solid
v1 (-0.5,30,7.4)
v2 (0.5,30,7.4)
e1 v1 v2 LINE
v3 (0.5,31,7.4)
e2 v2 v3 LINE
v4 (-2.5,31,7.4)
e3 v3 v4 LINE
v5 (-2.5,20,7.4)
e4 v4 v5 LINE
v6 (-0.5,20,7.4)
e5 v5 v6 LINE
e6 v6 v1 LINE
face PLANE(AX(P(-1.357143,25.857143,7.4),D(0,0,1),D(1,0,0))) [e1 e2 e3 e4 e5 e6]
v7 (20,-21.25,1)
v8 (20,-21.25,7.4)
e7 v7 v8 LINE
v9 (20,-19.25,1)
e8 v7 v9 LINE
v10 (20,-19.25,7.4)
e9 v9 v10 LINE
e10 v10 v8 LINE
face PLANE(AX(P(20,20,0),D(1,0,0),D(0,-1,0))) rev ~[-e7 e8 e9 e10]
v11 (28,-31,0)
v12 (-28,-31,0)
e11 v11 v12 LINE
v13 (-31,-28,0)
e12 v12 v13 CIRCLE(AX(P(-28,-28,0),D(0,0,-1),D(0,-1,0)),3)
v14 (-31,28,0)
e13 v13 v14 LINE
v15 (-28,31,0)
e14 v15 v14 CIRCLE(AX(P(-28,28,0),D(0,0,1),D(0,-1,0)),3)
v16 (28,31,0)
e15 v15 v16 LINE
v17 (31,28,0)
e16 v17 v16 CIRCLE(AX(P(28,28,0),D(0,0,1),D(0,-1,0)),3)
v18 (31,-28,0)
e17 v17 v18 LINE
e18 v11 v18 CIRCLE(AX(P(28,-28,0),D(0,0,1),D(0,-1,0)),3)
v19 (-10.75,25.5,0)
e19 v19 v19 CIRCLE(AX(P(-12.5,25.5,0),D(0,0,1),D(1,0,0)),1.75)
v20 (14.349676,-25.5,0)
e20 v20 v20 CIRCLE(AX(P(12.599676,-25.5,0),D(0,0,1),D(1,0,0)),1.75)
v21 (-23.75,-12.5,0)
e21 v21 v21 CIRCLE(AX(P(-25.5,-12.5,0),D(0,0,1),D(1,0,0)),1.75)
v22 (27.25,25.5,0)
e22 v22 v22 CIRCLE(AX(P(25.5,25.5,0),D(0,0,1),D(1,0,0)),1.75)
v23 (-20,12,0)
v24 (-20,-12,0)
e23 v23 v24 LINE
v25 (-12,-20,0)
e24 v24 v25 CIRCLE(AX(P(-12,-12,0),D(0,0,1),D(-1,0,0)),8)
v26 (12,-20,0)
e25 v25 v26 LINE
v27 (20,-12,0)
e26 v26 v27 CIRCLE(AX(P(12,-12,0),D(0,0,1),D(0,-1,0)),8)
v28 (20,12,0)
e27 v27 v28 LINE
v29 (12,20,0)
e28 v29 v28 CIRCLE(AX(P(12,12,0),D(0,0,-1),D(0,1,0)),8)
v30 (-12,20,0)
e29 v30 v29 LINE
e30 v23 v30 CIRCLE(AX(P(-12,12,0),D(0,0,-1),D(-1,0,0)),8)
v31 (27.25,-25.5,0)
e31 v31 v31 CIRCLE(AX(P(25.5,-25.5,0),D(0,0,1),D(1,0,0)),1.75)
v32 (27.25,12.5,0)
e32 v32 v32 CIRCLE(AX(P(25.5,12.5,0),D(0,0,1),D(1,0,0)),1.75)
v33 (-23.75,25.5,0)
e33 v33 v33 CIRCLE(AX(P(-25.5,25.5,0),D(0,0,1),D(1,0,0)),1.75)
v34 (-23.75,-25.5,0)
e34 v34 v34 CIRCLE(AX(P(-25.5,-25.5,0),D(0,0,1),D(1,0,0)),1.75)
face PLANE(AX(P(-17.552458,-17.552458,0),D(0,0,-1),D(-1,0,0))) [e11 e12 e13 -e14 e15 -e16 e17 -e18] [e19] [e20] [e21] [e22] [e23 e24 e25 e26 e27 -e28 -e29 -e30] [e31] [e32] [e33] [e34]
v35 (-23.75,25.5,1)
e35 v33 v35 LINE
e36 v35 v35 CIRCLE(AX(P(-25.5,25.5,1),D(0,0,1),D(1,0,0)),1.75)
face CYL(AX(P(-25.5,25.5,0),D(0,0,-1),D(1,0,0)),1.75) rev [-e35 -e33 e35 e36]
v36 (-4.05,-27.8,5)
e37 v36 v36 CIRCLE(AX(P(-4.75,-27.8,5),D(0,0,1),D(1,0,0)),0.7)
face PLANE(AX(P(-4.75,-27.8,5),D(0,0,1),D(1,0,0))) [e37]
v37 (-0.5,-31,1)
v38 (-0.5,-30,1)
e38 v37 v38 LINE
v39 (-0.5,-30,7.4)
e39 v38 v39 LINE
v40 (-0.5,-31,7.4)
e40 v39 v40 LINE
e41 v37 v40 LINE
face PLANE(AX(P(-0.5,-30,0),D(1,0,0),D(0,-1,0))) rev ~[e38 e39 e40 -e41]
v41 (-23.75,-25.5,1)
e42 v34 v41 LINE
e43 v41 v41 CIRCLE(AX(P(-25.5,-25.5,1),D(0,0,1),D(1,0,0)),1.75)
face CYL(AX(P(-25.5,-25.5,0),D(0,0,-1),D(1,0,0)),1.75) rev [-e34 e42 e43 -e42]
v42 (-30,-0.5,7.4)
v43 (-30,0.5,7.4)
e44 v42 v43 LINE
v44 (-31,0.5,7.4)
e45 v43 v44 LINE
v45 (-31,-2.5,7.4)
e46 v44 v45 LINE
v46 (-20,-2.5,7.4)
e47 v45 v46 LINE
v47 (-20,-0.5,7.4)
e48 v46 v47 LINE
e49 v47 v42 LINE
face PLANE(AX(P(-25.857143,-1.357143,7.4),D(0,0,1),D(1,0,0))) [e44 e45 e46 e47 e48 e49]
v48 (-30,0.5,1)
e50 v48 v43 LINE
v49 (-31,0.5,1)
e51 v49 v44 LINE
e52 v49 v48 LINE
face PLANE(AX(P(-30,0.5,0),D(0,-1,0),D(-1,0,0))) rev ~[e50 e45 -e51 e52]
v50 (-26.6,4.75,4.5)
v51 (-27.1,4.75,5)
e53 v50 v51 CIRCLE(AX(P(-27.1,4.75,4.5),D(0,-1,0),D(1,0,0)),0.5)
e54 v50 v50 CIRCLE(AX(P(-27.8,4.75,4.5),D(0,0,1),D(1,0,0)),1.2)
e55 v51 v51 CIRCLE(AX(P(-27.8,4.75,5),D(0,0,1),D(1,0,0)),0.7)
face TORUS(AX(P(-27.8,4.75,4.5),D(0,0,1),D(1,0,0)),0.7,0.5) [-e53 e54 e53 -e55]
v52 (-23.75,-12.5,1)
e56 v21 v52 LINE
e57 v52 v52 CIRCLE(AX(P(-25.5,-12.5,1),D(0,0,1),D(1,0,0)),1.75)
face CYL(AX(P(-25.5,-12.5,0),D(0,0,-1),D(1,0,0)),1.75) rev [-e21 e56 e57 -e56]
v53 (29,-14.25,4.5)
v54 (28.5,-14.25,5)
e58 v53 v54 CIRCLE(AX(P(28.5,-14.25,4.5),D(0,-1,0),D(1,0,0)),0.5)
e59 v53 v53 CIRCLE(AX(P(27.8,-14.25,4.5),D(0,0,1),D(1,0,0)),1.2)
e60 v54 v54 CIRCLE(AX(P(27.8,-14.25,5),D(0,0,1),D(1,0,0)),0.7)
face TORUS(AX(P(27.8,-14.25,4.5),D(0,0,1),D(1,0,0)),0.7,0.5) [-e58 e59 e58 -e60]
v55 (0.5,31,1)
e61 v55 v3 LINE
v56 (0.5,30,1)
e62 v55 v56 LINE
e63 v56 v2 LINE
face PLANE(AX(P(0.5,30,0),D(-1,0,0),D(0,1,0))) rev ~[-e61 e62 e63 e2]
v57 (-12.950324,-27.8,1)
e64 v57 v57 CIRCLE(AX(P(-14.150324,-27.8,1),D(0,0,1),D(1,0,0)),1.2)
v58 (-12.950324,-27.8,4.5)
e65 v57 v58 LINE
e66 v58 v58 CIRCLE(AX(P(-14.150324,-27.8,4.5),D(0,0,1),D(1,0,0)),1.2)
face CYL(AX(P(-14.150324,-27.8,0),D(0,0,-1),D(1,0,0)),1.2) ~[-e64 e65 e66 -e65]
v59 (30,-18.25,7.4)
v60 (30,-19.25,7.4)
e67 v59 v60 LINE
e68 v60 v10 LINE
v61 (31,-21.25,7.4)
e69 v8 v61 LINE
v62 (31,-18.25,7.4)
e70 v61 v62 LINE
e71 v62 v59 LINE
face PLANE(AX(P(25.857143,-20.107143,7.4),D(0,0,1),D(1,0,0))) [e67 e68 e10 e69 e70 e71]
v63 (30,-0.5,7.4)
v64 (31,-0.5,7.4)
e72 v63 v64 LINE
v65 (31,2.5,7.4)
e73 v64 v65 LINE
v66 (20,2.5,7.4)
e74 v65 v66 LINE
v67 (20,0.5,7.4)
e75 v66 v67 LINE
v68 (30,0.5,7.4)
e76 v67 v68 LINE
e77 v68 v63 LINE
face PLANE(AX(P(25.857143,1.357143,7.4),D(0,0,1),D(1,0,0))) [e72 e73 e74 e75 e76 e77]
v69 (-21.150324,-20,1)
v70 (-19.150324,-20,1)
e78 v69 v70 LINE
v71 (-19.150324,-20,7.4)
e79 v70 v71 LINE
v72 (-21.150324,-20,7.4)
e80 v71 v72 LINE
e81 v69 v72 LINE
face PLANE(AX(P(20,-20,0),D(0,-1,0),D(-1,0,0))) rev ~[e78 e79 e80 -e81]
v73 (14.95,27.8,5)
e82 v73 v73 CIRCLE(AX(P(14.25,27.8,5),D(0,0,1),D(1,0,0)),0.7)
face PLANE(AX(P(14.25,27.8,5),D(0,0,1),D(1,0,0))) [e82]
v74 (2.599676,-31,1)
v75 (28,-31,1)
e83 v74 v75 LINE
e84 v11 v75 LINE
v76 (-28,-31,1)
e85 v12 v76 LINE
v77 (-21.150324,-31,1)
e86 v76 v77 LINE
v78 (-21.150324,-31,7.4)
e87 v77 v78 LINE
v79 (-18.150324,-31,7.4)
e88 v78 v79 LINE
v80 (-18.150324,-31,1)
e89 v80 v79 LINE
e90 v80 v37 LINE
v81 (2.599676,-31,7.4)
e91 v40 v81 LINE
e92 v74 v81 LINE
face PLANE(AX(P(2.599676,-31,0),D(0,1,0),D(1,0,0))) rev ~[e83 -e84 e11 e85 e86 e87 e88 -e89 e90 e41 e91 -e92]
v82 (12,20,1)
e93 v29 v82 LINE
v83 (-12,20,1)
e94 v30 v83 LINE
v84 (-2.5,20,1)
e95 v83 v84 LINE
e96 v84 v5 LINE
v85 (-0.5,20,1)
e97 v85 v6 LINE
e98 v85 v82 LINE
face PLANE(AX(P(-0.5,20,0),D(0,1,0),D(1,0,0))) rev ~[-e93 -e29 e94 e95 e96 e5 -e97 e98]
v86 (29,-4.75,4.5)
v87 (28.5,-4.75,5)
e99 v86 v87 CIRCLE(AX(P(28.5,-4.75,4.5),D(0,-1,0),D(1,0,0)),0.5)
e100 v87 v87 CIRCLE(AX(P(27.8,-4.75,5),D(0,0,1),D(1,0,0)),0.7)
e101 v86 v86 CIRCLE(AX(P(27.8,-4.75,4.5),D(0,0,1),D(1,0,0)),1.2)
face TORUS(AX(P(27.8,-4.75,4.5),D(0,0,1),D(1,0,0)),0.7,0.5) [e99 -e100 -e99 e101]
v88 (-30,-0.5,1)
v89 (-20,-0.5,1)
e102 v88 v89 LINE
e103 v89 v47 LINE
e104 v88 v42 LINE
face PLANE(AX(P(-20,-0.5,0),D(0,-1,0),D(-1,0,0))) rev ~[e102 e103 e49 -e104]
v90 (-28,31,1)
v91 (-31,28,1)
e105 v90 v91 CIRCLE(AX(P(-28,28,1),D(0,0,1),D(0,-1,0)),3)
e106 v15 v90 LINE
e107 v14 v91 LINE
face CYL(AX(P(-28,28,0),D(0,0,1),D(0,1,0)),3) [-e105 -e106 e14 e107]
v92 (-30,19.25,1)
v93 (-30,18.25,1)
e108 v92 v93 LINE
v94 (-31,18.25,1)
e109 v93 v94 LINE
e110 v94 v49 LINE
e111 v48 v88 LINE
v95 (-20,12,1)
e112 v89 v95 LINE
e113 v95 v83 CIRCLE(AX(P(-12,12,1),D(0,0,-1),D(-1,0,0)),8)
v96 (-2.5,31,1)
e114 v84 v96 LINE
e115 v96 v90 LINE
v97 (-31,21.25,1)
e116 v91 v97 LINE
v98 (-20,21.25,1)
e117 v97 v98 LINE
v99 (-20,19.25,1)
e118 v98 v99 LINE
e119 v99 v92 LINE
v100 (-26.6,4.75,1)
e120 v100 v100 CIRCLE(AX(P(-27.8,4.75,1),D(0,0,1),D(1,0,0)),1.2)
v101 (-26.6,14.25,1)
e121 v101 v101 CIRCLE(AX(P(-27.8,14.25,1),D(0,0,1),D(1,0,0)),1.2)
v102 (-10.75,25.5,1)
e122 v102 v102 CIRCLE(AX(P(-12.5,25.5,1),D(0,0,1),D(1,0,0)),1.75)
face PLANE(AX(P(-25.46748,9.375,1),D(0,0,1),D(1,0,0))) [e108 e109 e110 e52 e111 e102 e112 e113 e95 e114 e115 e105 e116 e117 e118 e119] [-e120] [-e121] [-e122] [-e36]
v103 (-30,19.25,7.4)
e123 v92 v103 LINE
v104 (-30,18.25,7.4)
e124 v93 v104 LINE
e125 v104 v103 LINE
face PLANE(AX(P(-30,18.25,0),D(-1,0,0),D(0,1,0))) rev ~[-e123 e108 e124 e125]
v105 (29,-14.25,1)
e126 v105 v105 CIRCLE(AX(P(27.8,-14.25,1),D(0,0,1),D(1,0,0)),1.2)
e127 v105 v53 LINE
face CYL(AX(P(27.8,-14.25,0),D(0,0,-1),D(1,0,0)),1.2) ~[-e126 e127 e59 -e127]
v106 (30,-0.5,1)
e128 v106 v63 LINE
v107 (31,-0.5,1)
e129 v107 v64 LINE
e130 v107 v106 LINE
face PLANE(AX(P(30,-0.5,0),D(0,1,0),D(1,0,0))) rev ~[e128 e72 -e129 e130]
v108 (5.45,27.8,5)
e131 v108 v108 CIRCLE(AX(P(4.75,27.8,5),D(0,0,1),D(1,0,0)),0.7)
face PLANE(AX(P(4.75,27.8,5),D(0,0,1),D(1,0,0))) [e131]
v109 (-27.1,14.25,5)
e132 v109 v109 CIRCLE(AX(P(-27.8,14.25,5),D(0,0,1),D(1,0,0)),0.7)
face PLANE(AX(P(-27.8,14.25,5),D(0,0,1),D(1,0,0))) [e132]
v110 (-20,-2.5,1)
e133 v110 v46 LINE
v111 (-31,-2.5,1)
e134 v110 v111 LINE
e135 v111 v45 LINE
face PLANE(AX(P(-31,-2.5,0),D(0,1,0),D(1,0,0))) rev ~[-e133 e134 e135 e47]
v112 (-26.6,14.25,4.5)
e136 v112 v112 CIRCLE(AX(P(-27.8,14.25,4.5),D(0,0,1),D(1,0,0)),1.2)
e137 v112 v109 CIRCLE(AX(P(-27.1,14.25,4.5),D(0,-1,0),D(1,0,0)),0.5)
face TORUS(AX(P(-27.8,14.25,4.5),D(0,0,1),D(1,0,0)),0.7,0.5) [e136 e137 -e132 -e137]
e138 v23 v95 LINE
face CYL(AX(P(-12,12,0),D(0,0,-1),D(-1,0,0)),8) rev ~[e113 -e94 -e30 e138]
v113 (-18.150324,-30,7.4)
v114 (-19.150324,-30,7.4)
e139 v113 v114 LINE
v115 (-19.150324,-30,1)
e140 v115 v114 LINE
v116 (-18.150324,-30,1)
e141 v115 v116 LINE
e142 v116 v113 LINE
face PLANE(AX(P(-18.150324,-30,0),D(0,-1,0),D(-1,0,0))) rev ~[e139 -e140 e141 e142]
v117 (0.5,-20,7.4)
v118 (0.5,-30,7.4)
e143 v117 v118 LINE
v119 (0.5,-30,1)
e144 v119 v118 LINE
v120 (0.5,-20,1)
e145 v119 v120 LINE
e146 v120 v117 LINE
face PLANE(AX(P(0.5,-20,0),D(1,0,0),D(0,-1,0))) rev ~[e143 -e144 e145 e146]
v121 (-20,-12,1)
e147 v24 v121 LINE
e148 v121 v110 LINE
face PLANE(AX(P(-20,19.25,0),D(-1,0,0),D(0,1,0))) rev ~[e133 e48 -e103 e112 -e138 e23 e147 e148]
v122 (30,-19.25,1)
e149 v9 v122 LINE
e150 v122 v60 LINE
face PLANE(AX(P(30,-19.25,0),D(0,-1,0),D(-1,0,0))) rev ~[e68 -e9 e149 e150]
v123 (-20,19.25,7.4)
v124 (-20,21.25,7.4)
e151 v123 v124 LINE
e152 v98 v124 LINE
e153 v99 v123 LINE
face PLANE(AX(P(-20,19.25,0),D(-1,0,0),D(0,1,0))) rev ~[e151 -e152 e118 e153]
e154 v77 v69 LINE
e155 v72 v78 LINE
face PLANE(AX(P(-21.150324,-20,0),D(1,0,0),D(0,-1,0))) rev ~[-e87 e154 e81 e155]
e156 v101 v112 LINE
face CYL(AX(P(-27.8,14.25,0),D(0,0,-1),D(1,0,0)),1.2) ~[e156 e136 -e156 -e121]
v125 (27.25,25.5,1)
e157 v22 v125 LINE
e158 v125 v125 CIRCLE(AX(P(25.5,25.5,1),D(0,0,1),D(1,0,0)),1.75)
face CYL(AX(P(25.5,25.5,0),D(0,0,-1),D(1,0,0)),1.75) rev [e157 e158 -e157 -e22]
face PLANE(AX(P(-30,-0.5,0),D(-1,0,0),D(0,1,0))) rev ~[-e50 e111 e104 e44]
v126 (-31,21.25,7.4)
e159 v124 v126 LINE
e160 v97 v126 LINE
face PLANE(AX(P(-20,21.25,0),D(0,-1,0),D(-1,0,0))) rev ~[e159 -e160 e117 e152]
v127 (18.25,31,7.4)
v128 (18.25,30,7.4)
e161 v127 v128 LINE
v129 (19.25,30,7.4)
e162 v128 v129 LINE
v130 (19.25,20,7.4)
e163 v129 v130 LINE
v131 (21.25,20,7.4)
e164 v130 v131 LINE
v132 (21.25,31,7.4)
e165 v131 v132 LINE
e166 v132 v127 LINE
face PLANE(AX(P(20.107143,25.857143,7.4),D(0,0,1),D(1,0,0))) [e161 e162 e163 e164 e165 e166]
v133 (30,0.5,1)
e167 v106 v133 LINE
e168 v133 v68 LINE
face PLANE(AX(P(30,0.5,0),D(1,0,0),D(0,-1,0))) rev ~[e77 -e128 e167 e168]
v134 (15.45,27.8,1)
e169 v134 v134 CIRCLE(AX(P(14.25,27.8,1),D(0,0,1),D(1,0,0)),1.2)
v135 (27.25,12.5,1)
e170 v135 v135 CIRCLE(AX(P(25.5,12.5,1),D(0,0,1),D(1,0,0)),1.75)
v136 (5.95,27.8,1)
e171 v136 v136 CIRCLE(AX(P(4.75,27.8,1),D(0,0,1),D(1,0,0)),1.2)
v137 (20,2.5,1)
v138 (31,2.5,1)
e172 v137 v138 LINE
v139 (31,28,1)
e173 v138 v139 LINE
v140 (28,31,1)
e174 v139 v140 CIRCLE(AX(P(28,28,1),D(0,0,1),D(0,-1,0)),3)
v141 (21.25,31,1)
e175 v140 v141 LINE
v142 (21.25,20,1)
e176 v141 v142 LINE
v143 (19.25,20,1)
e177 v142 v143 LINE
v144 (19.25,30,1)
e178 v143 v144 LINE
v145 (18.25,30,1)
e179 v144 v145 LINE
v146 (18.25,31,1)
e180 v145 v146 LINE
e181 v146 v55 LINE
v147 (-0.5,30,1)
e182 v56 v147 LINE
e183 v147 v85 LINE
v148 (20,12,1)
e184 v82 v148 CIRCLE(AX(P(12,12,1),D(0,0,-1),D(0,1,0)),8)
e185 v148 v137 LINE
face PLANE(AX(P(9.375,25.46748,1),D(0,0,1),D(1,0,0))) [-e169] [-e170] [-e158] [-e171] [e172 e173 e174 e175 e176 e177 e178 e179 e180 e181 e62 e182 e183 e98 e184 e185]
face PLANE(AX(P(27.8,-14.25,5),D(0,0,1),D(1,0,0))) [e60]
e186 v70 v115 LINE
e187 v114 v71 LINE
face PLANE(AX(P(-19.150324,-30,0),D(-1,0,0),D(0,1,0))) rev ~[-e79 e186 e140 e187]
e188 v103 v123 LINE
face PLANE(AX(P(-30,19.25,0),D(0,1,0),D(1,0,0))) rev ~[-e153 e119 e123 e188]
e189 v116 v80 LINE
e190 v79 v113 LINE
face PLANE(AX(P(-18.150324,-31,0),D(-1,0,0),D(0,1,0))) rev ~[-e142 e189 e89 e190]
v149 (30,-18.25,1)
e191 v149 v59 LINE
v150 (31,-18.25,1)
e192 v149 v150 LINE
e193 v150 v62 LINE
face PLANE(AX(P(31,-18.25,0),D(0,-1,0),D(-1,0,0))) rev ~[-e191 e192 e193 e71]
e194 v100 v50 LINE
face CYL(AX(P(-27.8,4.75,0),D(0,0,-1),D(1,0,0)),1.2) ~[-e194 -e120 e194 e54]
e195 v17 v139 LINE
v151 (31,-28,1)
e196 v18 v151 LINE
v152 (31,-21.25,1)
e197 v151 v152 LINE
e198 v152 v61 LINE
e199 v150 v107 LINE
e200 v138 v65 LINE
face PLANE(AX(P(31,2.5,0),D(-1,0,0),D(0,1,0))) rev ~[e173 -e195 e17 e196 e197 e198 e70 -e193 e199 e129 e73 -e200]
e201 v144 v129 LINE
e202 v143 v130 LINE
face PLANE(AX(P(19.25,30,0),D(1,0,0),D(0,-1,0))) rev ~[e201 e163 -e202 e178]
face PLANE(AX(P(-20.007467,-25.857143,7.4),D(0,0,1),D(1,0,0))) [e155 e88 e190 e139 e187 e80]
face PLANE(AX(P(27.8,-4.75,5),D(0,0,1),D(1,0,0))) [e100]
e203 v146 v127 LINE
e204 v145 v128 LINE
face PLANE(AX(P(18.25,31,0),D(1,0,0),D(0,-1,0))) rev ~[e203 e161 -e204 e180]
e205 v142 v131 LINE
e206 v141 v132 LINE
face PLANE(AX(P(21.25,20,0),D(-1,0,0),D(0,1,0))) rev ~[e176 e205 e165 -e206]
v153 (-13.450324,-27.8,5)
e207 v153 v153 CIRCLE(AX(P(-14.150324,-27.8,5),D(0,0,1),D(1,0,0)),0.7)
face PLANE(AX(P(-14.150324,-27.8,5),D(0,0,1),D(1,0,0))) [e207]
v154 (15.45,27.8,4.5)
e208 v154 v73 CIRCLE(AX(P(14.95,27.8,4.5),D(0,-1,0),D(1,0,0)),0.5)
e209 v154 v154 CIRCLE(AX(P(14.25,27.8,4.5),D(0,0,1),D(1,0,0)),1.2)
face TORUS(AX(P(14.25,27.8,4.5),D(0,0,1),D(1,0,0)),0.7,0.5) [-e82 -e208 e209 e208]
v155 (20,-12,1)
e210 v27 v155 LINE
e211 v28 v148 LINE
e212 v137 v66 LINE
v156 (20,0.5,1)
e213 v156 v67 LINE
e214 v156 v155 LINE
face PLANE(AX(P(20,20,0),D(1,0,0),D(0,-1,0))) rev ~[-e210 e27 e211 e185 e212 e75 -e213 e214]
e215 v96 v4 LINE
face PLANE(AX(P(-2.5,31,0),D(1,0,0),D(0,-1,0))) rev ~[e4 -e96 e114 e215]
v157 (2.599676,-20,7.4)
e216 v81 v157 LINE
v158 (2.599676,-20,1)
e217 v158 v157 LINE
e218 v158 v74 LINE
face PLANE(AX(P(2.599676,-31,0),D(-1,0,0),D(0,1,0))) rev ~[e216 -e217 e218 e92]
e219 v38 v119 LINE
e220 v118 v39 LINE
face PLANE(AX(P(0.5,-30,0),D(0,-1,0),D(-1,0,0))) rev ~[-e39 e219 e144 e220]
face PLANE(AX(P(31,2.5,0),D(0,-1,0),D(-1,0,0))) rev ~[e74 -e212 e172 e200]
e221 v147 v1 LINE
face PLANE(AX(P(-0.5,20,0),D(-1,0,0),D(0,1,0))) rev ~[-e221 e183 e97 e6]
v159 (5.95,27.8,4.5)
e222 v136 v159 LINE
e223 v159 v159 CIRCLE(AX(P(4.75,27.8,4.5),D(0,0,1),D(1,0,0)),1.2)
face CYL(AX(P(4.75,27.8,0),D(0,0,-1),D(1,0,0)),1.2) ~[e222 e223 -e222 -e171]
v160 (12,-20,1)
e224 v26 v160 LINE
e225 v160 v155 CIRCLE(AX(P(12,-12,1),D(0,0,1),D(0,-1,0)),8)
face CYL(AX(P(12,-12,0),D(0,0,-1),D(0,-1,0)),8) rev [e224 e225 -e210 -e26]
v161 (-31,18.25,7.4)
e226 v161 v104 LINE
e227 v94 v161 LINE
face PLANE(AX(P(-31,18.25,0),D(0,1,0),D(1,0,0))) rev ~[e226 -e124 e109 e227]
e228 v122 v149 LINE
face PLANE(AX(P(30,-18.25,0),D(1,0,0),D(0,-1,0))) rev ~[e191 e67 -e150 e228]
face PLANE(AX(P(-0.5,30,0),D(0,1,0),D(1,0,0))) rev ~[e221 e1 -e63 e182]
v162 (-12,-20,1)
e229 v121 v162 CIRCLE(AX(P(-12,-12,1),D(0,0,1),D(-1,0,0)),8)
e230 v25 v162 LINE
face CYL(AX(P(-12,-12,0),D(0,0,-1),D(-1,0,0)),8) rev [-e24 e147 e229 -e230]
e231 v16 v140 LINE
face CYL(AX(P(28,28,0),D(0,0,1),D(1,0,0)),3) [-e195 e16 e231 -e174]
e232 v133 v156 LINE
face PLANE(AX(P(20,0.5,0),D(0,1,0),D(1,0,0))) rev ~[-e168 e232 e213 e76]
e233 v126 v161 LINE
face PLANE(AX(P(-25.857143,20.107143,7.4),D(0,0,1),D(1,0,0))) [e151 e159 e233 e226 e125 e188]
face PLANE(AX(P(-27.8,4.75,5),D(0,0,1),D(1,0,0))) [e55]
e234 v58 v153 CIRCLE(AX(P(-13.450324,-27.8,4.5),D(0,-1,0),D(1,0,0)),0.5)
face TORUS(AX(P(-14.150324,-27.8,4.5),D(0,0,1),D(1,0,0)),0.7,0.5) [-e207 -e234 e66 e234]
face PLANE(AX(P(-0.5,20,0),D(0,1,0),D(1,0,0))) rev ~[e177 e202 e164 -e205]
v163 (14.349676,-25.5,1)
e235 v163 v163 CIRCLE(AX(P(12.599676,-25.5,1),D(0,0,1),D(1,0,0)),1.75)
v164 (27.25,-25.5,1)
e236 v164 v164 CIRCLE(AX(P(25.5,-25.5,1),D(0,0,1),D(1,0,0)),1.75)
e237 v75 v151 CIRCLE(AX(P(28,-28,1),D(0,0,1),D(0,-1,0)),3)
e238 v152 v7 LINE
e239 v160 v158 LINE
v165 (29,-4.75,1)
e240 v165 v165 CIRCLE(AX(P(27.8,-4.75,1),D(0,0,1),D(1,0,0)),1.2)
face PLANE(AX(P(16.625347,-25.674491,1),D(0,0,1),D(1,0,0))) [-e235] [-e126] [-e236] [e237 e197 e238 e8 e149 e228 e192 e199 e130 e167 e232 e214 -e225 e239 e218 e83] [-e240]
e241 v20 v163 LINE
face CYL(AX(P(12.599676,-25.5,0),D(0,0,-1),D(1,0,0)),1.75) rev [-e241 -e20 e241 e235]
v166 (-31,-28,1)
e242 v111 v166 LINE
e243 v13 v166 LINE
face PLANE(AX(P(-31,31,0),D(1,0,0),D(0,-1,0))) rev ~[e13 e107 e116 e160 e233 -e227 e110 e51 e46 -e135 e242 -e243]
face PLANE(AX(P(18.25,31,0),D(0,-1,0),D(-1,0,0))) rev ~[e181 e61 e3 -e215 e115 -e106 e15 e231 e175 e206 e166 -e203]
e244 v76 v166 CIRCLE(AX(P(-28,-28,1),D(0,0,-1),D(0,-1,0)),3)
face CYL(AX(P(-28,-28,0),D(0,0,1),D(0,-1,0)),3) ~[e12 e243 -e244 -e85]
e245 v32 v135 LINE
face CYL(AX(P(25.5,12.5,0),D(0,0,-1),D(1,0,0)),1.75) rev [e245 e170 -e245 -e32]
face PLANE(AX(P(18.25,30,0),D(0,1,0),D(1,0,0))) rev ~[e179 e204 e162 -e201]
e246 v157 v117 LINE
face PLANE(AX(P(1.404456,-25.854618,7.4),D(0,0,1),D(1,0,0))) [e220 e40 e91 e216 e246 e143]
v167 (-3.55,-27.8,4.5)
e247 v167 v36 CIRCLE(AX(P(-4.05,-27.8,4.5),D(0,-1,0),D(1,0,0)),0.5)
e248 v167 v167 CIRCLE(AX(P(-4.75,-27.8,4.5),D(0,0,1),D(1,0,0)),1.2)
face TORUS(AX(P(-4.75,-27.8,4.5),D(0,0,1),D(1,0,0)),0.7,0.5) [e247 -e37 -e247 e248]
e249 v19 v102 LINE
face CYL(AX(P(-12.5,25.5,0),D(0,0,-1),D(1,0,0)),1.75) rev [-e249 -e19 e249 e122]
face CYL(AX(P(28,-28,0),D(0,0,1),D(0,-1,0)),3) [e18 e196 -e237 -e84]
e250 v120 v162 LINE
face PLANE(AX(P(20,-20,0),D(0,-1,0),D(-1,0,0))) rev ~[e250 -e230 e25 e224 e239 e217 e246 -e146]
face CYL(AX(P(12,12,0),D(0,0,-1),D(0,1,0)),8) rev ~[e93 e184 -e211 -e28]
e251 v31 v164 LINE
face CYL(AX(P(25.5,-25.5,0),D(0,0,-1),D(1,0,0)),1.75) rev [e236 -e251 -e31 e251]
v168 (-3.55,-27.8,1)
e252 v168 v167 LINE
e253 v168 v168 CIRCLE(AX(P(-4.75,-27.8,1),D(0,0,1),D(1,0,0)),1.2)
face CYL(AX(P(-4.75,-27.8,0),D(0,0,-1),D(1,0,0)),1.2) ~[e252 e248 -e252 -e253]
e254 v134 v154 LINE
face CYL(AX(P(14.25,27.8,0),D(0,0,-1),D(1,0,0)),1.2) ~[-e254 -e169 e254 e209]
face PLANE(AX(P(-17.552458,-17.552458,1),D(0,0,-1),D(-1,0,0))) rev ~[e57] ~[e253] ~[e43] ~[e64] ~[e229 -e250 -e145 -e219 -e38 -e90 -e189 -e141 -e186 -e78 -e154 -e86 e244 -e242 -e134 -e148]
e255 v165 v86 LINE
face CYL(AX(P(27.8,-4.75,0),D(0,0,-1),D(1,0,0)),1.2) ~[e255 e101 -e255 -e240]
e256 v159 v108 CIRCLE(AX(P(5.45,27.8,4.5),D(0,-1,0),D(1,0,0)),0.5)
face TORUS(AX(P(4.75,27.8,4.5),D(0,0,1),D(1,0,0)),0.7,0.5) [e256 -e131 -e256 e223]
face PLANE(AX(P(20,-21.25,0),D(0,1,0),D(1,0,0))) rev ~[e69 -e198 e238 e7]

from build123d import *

# Parameters (mm, degrees)
F1_DEPTH    = 7.4
F0_R        = 1.2
F2_DEPTH    = 5
F0_R_2      = 1.75
F3_DEPTH    = 1
F4_R        = 3
F5_R        = 0.5
F6_T1_DEPTH = 1


# Not quite as in the source:
# - a fillet or chamfer that OpenCascade refuses, or shapes differently, is made with other operations: its cross-section is extruded or revolved along the edge and cut away or added


with BuildPart() as f1:
    # F0 (on Top) → F1 (new body)
    with BuildSketch(Plane.XY):
        Polygon((-2.5, 20), (-0.5, 20), (-0.5, 30), (0.5, 30), (0.5, 31), (0, 31), (-2.5, 31), align=None)
    extrude(amount=F1_DEPTH)



with BuildPart() as f1b:
    # F0 (on Top) → F1, piece 2 (new body)
    with BuildSketch(Plane.XY):
        Polygon((19.25, 30), (19.25, 20), (20, 20), (21.25, 20), (21.25, 31), (18.25, 31), (18.25, 30), align=None)
    extrude(amount=F1_DEPTH)


with BuildPart() as f1c:
    # F0 (on Top) → F1, piece 3 (new body)
    with BuildSketch(Plane.XY):
        Polygon((31, 2.5), (20, 2.5), (20, 0.5), (30, 0.5), (30, -0.5), (31, -0.5), align=None)
    extrude(amount=F1_DEPTH)


with BuildPart() as f1d:
    # F0 (on Top) → F1, piece 4 (new body)
    with BuildSketch(Plane.XY):
        Polygon((30, -19.25), (20, -19.25), (20, -20), (20, -21.25), (31, -21.25), (31, -18.25), (30, -18.25), align=None)
    extrude(amount=F1_DEPTH)


with BuildPart() as f1e:
    # F0 (on Top) → F1, piece 5 (new body)
    with BuildSketch(Plane.XY):
        Polygon((2.599675854, -31), (2.599675854, -20), (0.5, -20), (0.5, -30), (-0.5, -30), (-0.5, -31), (0, -31), align=None)
    extrude(amount=F1_DEPTH)


with BuildPart() as f1f:
    # F0 (on Top) → F1, piece 6 (new body)
    with BuildSketch(Plane.XY):
        Polygon((-19.150324146, -20), (-20, -20), (-21.150324146, -20), (-21.150324146, -31), (-18.150324146, -31), (-18.150324146, -30), (-19.150324146, -30), align=None)
    extrude(amount=F1_DEPTH)


with BuildPart() as f1g:
    # F0 (on Top) → F1, piece 7 (new body)
    with BuildSketch(Plane.XY):
        Polygon((-20, -2.5), (-20, -0.5), (-30, -0.5), (-30, 0.5), (-31, 0.5), (-31, -2.5), align=None)
    extrude(amount=F1_DEPTH)


with BuildPart() as f1h:
    # F0 (on Top) → F1, piece 8 (new body)
    with BuildSketch(Plane.XY):
        Polygon((-20, 19.25), (-20, 20), (-20, 21.25), (-31, 21.25), (-31, 18.25), (-30, 18.25), (-30, 19.25), align=None)
    extrude(amount=F1_DEPTH)


with BuildPart() as f2:
    # F0 (on Top) → F2 (new body)
    with BuildSketch(Plane.XY):
        with Locations((4.75, 27.8)):
            Circle(F0_R)
    extrude(amount=F2_DEPTH)


with BuildPart() as f2b:
    # F0 (on Top) → F2, piece 2 (new body)
    with BuildSketch(Plane.XY):
        with Locations((14.25, 27.8)):
            Circle(F0_R)
    extrude(amount=F2_DEPTH)


with BuildPart() as f2c:
    # F0 (on Top) → F2, piece 3 (new body)
    with BuildSketch(Plane.XY):
        with Locations((27.8, -4.75)):
            Circle(F0_R)
    extrude(amount=F2_DEPTH)


with BuildPart() as f2d:
    # F0 (on Top) → F2, piece 4 (new body)
    with BuildSketch(Plane.XY):
        with Locations((27.8, -14.25)):
            Circle(F0_R)
    extrude(amount=F2_DEPTH)


with BuildPart() as f2e:
    # F0 (on Top) → F2, piece 5 (new body)
    with BuildSketch(Plane.XY):
        with Locations((-4.75, -27.8)):
            Circle(F0_R)
    extrude(amount=F2_DEPTH)


with BuildPart() as f2f:
    # F0 (on Top) → F2, piece 6 (new body)
    with BuildSketch(Plane.XY):
        with Locations((-14.150324146, -27.8)):
            Circle(F0_R)
    extrude(amount=F2_DEPTH)


with BuildPart() as f2g:
    # F0 (on Top) → F2, piece 7 (new body)
    with BuildSketch(Plane.XY):
        with Locations((-27.8, 14.25)):
            Circle(F0_R)
    extrude(amount=F2_DEPTH)


with BuildPart() as f2h:
    # F0 (on Top) → F2, piece 8 (new body)
    with BuildSketch(Plane.XY):
        with Locations((-27.8, 4.75)):
            Circle(F0_R)
    extrude(amount=F2_DEPTH)


with BuildPart() as f1_1:
    add(f1.part)

    add(f1b.part)  # F3 merges F1b

    add(f1c.part)  # F3 merges F1c

    add(f1d.part)  # F3 merges F1d

    add(f1e.part)  # F3 merges F1e

    add(f1f.part)  # F3 merges F1f

    add(f1g.part)  # F3 merges F1g

    add(f1h.part)  # F3 merges F1h

    add(f2.part)  # F3 merges F2

    add(f2b.part)  # F3 merges F2b

    add(f2c.part)  # F3 merges F2c

    add(f2d.part)  # F3 merges F2d

    add(f2e.part)  # F3 merges F2e

    add(f2f.part)  # F3 merges F2f

    add(f2g.part)  # F3 merges F2g

    add(f2h.part)  # F3 merges F2h
    # F0 (on Top) → F3 (join)
    with BuildSketch(Plane.XY):
        Polygon((-0.5, 20), (0, 20), (19.25, 20), (19.25, 30), (18.25, 30), (18.25, 31), (0.5, 31), (0.5, 30), (-0.5, 30), align=None)
        with Locations((4.75, 27.8)):
            Circle(F0_R, mode=Mode.SUBTRACT)
        with Locations((14.25, 27.8)):
            Circle(F0_R, mode=Mode.SUBTRACT)
        Polygon((-20, 20), (-2.5, 20), (-2.5, 31), (-31, 31), (-31, 21.25), (-20, 21.25), align=None)
        with Locations((-25.5, 25.5)):
            Circle(F0_R_2, mode=Mode.SUBTRACT)
        with Locations((-12.5, 25.5)):
            Circle(F0_R_2, mode=Mode.SUBTRACT)
        Polygon((-20, -0.5), (-20, 19.25), (-30, 19.25), (-30, 18.25), (-31, 18.25), (-31, 0.5), (-30, 0.5), (-30, -0.5), align=None)
        with Locations((-27.8, 4.75)):
            Circle(F0_R, mode=Mode.SUBTRACT)
        with Locations((-27.8, 14.25)):
            Circle(F0_R, mode=Mode.SUBTRACT)
        Polygon((-20, -20), (-20, -2.5), (-31, -2.5), (-31, -31), (-21.150324146, -31), (-21.150324146, -20), align=None)
        with Locations((-25.5, -25.5)):
            Circle(F0_R_2, mode=Mode.SUBTRACT)
        with Locations((-25.5, -12.5)):
            Circle(F0_R_2, mode=Mode.SUBTRACT)
        Polygon((0.5, -30), (0.5, -20), (0, -20), (-17.1610249381, -20), (-19.150324146, -20), (-19.150324146, -30), (-18.150324146, -30), (-18.150324146, -31), (-17.1610249381, -31), (-3.6785447102, -31), (-0.5, -31), (-0.5, -30), align=None)
        with Locations((-14.150324146, -27.8)):
            Circle(F0_R, mode=Mode.SUBTRACT)
        with Locations((-4.75, -27.8)):
            Circle(F0_R, mode=Mode.SUBTRACT)
        Polygon((20, -21.25), (20, -20), (2.599675854, -20), (2.599675854, -31), (31, -31), (31, -21.25), align=None)
        with Locations((12.599675854, -25.5)):
            Circle(F0_R_2, mode=Mode.SUBTRACT)
        with Locations((25.5, -25.5)):
            Circle(F0_R_2, mode=Mode.SUBTRACT)
        Polygon((30, 0.5), (20, 0.5), (20, -19.25), (30, -19.25), (30, -18.25), (31, -18.25), (31, -0.5), (30, -0.5), align=None)
        with Locations((27.8, -14.25)):
            Circle(F0_R, mode=Mode.SUBTRACT)
        with Locations((27.8, -4.75)):
            Circle(F0_R, mode=Mode.SUBTRACT)
        Polygon((21.25, 20), (20, 20), (20, 2.5), (31, 2.5), (31, 31), (21.25, 31), align=None)
        with Locations((25.5, 12.5)):
            Circle(F0_R_2, mode=Mode.SUBTRACT)
        with Locations((25.5, 25.5)):
            Circle(F0_R_2, mode=Mode.SUBTRACT)
    extrude(amount=F3_DEPTH)

    # F4
    f4_edges = [f1_1.edges().sort_by_distance(p)[0] for p in [
        (-31, 31, 0.5),
        (31, 31, 0.5),
        (31, -31, 0.5),
        (-31, -31, 0.5),
    ]]
    fillet(f4_edges, radius=F4_R)

    # F5
    f5_edges = [f1_1.edges().sort_by_distance(p)[0] for p in [
        (13.05, 27.8, 5),
        (3.55, 27.8, 5),
        (-29, 14.25, 5),
        (-29, 4.75, 5),
        (26.6, -4.75, 5),
        (26.6, -14.25, 5),
        (-5.95, -27.8, 5),
        (-15.350324, -27.8, 5),
    ]]
    fillet(f5_edges, radius=F5_R)

    # F6: fillet of radius 8 on 4 edges, made by hand

    # F6_s2 → F6_t1 (join)
    with BuildSketch(Plane.XY):
        with BuildLine():
            ThreePointArc((-20, -12), (-17.6568542495, -17.6568542495), (-12, -20))
            Line((-12, -20), (-20, -20))
            Line((-20, -20), (-20, -12))
        make_face()
        with BuildLine():
            ThreePointArc((12, -20), (17.6568542495, -17.6568542495), (20, -12))
            Line((20, -12), (20, -20))
            Line((20, -20), (12, -20))
        make_face()
        with BuildLine():
            ThreePointArc((12, 20), (17.6568542495, 17.6568542495), (20, 12))
            Line((20, 12), (20, 20))
            Line((20, 20), (12, 20))
        make_face()
        with BuildLine():
            ThreePointArc((-20, 12), (-17.6568542495, 17.6568542495), (-12, 20))
            Line((-12, 20), (-20, 20))
            Line((-20, 20), (-20, 12))
        make_face()
    extrude(amount=F6_T1_DEPTH)


solid = f1_1.part
